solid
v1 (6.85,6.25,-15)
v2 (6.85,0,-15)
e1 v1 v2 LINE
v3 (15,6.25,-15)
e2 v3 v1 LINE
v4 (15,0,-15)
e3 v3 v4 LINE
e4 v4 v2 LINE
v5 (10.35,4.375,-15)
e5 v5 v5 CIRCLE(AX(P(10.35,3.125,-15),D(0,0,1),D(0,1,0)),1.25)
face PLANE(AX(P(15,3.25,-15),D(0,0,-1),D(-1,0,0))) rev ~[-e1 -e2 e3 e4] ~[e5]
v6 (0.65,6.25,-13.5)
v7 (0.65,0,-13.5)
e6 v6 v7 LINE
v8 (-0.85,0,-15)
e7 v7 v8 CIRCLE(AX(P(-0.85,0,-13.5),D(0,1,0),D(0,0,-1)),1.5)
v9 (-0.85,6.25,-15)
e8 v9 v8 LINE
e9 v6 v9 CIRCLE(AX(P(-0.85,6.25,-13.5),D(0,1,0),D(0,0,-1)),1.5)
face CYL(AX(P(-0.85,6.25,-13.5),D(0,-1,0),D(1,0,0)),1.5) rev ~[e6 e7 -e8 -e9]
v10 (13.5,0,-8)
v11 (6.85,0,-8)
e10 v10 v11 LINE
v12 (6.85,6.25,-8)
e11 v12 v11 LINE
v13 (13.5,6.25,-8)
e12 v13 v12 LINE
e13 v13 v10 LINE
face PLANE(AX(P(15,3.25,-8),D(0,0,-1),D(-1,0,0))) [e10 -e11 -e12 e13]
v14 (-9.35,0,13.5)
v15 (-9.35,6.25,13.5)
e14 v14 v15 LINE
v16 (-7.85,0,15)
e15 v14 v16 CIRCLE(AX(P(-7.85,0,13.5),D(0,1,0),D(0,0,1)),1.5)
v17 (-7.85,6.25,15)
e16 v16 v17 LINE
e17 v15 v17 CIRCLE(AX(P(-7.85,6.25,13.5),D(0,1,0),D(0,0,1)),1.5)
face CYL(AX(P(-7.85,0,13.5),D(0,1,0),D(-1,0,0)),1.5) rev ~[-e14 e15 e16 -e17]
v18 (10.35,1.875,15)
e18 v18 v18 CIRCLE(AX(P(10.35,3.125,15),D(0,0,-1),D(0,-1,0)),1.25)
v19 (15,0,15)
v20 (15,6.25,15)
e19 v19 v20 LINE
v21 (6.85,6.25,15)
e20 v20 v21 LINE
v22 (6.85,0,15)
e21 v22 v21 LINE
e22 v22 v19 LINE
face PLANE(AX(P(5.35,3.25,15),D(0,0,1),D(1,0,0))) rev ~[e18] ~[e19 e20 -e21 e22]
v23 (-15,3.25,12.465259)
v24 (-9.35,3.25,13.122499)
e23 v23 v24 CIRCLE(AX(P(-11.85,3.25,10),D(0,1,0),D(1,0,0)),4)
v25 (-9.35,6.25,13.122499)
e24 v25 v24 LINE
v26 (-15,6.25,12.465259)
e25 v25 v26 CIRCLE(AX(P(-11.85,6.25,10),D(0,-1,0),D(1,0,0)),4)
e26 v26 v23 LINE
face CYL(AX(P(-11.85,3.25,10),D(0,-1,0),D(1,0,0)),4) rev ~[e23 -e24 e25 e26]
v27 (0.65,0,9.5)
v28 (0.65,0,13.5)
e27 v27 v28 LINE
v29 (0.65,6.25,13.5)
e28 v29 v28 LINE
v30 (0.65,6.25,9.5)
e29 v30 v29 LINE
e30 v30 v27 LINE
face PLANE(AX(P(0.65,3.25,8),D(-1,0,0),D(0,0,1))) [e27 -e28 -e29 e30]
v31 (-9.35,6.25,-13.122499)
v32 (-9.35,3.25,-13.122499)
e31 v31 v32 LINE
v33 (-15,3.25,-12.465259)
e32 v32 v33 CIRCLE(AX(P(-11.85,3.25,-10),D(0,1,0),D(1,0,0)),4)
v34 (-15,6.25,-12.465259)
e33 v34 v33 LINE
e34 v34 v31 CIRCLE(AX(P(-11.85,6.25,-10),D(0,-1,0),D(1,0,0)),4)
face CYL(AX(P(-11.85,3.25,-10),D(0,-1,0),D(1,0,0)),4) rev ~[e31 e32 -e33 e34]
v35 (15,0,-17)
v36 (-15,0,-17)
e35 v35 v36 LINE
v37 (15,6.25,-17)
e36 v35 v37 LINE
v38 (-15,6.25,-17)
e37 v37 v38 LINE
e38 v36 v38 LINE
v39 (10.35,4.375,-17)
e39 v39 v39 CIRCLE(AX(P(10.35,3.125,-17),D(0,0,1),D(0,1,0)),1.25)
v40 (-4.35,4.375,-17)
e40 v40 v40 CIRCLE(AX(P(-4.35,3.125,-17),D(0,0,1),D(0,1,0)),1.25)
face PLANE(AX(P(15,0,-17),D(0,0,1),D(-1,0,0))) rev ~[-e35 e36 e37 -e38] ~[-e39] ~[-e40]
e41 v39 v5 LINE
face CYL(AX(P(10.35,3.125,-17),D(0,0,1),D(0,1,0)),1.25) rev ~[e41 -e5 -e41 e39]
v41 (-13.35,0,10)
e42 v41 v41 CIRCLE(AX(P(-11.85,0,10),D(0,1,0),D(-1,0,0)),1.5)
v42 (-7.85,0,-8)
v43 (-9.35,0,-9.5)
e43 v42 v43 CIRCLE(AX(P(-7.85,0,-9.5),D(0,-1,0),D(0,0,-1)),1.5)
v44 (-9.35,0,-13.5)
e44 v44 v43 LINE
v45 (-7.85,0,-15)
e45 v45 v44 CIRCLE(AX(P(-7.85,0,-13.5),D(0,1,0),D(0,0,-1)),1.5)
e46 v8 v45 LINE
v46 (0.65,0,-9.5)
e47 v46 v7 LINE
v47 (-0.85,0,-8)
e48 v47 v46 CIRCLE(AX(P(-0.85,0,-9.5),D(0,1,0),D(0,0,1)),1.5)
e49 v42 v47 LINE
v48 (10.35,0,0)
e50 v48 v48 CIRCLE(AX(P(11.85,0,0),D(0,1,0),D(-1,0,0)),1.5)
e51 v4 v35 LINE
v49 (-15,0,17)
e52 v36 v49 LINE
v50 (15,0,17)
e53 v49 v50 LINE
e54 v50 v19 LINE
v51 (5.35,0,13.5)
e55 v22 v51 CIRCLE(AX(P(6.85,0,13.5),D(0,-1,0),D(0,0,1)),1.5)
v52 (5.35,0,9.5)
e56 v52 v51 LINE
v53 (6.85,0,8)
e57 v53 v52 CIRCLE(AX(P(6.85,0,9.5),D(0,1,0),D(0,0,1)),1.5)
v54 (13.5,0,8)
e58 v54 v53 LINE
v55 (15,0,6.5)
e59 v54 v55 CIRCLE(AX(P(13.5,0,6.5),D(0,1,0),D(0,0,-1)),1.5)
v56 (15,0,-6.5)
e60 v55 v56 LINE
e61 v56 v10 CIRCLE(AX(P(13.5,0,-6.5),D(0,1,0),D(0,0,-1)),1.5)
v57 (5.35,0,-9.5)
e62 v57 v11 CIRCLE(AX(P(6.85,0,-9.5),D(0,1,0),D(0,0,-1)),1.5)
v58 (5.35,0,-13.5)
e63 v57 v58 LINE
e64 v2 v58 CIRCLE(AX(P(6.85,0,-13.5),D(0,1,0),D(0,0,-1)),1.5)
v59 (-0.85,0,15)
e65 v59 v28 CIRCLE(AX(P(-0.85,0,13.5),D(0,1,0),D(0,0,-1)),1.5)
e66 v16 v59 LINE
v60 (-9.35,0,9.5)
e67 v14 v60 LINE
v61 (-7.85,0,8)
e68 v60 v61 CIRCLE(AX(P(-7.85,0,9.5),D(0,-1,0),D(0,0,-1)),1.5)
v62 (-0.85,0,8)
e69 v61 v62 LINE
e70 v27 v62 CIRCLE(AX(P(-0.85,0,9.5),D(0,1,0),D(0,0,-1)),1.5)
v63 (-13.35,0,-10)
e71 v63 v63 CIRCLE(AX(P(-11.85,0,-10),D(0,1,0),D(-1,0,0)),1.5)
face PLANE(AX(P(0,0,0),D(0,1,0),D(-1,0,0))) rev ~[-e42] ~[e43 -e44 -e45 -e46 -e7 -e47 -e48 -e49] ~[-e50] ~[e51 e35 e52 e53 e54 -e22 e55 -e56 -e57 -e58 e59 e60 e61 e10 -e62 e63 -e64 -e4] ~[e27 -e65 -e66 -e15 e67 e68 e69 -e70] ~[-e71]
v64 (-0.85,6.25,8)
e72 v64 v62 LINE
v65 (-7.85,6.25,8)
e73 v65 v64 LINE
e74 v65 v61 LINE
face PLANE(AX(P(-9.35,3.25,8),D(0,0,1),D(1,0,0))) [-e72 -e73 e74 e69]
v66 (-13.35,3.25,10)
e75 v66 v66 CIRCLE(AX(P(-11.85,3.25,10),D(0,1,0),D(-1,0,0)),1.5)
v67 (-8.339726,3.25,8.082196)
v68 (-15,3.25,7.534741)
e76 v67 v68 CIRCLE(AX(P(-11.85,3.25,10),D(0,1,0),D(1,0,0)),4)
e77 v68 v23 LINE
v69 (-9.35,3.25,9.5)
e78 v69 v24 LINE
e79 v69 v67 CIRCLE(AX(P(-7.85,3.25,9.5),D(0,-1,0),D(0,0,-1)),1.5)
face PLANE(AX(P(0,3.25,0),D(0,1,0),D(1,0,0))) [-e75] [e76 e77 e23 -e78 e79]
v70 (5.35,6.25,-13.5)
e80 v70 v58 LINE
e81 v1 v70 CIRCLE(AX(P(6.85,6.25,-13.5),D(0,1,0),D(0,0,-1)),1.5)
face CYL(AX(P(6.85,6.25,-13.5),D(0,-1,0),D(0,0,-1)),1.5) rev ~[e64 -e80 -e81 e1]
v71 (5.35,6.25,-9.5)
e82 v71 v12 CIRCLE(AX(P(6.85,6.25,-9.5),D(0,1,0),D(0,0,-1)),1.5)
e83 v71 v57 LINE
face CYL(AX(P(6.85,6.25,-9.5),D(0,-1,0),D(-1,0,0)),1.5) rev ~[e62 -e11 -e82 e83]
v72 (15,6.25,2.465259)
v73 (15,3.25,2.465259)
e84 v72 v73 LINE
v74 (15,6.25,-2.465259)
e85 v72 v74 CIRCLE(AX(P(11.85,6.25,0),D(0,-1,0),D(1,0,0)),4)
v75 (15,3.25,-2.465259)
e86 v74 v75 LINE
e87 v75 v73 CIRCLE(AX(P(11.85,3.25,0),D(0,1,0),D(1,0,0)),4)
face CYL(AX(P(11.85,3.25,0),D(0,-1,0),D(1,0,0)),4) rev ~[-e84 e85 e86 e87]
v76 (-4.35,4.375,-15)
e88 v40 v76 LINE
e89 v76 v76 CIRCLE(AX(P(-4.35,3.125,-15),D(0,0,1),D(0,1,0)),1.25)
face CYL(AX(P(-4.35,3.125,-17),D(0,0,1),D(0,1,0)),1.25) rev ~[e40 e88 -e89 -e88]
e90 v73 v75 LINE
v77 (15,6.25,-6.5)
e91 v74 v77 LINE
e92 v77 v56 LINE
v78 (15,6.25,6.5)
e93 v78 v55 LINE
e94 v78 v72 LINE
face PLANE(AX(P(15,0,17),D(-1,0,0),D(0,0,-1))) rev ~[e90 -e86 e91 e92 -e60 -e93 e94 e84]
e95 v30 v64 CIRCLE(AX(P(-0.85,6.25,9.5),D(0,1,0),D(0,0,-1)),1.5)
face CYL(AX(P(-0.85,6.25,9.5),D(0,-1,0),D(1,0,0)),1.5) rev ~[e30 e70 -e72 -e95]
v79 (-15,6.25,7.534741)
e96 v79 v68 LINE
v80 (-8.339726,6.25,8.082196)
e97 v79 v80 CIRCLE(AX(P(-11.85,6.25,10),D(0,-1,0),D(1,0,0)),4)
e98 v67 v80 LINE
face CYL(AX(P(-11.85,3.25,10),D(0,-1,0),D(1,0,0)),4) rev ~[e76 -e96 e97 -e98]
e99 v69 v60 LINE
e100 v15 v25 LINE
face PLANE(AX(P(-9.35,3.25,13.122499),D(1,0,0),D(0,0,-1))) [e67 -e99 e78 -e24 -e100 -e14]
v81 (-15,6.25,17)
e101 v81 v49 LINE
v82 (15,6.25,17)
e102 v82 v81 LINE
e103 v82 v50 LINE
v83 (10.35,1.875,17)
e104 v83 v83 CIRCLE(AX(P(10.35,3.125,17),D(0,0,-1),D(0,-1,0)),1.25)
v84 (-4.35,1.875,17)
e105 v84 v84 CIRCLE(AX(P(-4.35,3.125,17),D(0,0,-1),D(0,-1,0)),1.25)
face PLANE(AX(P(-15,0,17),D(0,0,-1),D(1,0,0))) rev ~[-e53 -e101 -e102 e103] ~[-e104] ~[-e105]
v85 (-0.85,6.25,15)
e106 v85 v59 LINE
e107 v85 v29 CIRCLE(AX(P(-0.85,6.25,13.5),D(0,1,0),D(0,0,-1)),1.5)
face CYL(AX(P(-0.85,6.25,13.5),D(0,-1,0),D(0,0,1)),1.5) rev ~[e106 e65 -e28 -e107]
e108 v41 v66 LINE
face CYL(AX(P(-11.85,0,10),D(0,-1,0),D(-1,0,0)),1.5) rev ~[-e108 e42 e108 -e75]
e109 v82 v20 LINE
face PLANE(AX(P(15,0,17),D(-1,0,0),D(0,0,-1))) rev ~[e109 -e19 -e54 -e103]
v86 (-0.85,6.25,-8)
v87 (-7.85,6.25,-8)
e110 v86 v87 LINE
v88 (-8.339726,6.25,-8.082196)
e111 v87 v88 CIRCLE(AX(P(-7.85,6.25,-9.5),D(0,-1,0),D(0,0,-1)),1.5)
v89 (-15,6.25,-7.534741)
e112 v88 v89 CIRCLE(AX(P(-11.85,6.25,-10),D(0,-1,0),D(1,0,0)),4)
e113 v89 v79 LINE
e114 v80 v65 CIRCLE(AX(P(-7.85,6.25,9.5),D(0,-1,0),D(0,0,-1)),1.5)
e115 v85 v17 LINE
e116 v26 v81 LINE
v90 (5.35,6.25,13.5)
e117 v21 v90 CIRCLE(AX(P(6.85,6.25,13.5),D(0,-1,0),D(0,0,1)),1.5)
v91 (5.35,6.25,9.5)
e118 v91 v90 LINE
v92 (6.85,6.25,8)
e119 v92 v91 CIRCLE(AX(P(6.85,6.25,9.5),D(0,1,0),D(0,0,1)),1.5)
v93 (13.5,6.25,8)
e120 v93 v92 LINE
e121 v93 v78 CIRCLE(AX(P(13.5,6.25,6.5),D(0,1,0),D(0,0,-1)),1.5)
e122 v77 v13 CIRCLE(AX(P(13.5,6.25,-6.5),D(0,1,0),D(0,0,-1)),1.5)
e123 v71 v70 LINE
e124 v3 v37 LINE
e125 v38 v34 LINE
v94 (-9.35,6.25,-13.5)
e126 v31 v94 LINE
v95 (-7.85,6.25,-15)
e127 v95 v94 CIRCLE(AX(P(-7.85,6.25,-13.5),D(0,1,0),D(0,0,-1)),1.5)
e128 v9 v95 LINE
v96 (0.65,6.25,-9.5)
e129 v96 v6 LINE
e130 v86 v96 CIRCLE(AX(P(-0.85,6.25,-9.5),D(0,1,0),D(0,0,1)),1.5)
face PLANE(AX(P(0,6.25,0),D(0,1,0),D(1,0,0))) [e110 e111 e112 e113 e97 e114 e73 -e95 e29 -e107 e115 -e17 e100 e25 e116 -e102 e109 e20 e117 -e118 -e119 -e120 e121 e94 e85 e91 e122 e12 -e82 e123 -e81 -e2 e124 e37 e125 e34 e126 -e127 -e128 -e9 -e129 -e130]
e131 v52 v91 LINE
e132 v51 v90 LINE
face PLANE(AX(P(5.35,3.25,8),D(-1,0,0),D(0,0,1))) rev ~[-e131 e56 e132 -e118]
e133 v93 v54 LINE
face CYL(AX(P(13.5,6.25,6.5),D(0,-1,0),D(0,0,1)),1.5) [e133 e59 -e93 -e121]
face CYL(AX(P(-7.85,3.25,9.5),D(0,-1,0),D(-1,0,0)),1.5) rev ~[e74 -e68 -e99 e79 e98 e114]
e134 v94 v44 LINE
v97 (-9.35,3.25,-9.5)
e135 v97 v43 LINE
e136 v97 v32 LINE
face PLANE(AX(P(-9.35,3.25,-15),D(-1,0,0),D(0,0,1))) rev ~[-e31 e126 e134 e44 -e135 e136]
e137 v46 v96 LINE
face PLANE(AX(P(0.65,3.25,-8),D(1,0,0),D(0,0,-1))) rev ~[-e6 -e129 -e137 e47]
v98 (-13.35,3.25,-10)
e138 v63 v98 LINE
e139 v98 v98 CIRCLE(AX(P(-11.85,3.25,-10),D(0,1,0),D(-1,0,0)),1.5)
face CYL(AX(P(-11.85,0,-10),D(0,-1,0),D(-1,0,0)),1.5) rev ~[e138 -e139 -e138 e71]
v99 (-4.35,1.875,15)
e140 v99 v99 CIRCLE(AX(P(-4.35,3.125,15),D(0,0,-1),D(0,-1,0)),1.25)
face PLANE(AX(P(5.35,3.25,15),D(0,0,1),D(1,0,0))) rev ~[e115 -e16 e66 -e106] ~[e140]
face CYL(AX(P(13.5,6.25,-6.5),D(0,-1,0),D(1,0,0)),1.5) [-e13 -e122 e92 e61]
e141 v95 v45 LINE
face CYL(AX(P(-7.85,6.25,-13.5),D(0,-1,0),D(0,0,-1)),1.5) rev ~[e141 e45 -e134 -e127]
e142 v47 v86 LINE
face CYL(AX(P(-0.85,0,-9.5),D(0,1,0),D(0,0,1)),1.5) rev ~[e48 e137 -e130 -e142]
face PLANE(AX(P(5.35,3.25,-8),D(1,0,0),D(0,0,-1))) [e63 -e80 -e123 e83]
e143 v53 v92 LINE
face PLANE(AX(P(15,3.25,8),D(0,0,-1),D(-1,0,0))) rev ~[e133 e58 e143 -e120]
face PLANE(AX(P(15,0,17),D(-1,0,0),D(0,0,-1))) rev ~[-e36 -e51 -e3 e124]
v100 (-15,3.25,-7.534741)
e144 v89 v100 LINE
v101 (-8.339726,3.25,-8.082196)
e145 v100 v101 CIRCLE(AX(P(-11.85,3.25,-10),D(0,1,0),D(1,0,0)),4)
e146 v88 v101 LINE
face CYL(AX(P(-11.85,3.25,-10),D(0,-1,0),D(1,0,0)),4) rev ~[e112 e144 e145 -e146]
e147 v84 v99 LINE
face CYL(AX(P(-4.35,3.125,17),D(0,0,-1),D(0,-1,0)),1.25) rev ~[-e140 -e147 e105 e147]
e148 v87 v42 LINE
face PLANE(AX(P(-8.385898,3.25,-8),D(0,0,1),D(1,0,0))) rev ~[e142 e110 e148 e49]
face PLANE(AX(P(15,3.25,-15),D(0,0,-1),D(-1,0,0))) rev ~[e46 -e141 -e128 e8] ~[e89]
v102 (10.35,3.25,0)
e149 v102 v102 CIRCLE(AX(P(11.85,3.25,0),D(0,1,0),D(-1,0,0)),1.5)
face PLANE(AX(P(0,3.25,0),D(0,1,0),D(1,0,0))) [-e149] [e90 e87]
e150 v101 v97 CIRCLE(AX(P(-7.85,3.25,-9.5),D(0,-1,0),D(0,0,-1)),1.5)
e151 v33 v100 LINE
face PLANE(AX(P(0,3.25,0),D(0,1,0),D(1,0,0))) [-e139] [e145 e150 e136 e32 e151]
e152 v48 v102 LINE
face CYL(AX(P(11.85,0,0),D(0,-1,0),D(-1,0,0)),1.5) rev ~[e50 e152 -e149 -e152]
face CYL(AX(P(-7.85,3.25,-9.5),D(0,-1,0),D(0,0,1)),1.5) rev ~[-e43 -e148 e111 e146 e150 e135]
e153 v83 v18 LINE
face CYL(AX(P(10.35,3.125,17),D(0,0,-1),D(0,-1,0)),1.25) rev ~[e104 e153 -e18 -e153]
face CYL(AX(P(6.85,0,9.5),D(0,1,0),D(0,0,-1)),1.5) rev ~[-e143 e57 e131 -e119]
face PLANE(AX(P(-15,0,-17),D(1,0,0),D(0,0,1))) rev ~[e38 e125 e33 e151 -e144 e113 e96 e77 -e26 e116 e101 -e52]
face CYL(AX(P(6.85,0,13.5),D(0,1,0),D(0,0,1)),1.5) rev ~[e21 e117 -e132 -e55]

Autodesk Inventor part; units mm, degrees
ref_plane "YZ Plane" through (0, 0, 0) normal (1, 0, 0) x (0, 1, 0)
ref_plane "XZ Plane" through (0, 0, 0) normal (0, 1, 0) x (-1, 0, 0)
sketch "Sketch1" plane through (0, 0, 0) normal (0, 1, 0) x (-1, 0, 0)
  line L0 (-15, -17) -> (15, -17)
  line L1 (15, -17) -> (15, 17)
  line L2 (15, 17) -> (-15, 17)
  line L3 (-15, 17) -> (-15, -17)
  line L4 (-15, -17) -> (15, 17) construction
  line L5 (15, -17) -> (-15, 17) construction
  line L6 (-21, 0) -> (21, 0) construction
  line L7 (15, 10) -> (-15, 10) construction
  line L8 (11.85, 17) -> (11.85, -17) construction
  line L9 (0, -23.8) -> (0, 23.8) construction
  line L10 (-11.85, 17) -> (-11.85, -17) construction
  line L11 (15, -10) -> (-15, -10) construction
  circle A0 centre (11.85, 10) radius 1.5
  circle A1 centre (11.85, -10) radius 1.5
  circle A2 centre (-11.85, 0) radius 1.5
  point P0 (0, 0)
  dimension "d0" = 34
  dimension "d1" = 30
  dimension "d2" = 10
  dimension "d3" = 11.85
  dimension "d4" = 3
  dimension "d5" = 3
  dimension "d6" = 3
extrude "Extrusion1" add sketch "Sketch1" along normal blind 3.25
sketch "Sketch2" plane through (0, 3.25, 0) normal (0, 1, 0) x (1, 0, 0)
  line L0 (15, 17) -> (-15, 17) projected
  line L1 (15, -17) -> (15, 17) projected
  line L2 (-15, 17) -> (15, 17)
  line L3 (15, 17) -> (15, 15)
  line L4 (15, 15) -> (-15, 15)
  line L5 (-15, 15) -> (-15, 17)
  line L6 (21, 0) -> (-21, 0) construction
  line L7 (15, -17) -> (-15, -17)
  line L8 (15, 17) -> (15, -17)
  line L9 (15, -15) -> (-15, -15)
  line L10 (-15, -15) -> (-15, -17)
  point P0 (0, 0)
  dimension "d9" = 2
extrude "Extrusion2" add sketch "Sketch2" along normal blind 3
sketch "Sketch5" plane through (15, 0, -17) normal (0, 0, -1) x (-1, 0, 0)
  line L0 (0, 0) -> (30, 0) projected
  line L1 (30, 0) -> (30, 6.25) projected
  line L2 (0, 6.25) -> (30, 6.25) projected
  line L3 (0, 0) -> (0, 6.25) projected
  line L4 (0, 3.125) -> (4.65, 3.125) construction
  line L5 (4.65, 3.125) -> (19.35, 3.125) construction
  dimension "d40" = 4.65
  dimension "d41" = 14.7
sketch "Sketch8" plane through (0, 3.25, 0) normal (0, 1, 0) x (1, 0, 0)
  line L0 (15, 15) -> (-15, 15) projected
  line L1 (-15, 15) -> (-15, -15) projected
  line L2 (-15, -15) -> (15, -15) projected
  line L3 (15, -15) -> (15, 15) projected
  circle A0 centre (-11.85, -10) radius 1.5 projected
  circle A1 centre (-11.85, 10) radius 1.5 projected
  circle A2 centre (11.85, 0) radius 1.5 projected
  line L4 (-9.35, -15) -> (-9.35, -8)
  line L5 (-9.35, -8) -> (0.65, -8)
  line L6 (0.65, -8) -> (0.65, -15)
  line L7 (15, -8) -> (5.35, -8)
  line L8 (5.35, -8) -> (5.35, -15)
  line L9 (15, -8) -> (15, -15)
  line L10 (15, -17) -> (15, 17) projected
  line L11 (15, -15) -> (5.35, -15)
  line L12 (0.65, -15) -> (-9.35, -15)
  line L13 (15, 0) -> (-15, 0) construction
  line L14 (-15, 17) -> (-15, -17) construction
  line L15 (-15, 15) -> (15, 15)
  line L16 (15, 15) -> (15, -15)
  line L17 (-9.35, 15) -> (-9.35, 8)
  line L18 (-9.35, 8) -> (0.65, 8)
  line L19 (0.65, 8) -> (0.65, 15)
  line L20 (15, 8) -> (5.35, 8)
  line L21 (5.35, 8) -> (5.35, 15)
  line L22 (15, 8) -> (15, 15)
  line L23 (15, 17) -> (15, -17)
  line L24 (15, 15) -> (5.35, 15)
  line L25 (0.65, 15) -> (-9.35, 15)
  circle A3 centre (11.85, 0) radius 4
  circle A4 centre (-11.85, 10) radius 4
  circle A5 centre (-11.85, -10) radius 4
  point P0 (0, 0)
  dimension "d34" = 9.65
  dimension "d35" = 4.7
  dimension "d36" = 10
  dimension "d37" = 8
  dimension "d44" = 8
extrude "Extrusion5" cut sketch "Sketch8" against normal through all contours L3 L20 L21 L0 | L19 L18 A4 L17 L0 | A4 L18 L17 | L3 L2 L8 L7 | A5 L4 L5 | L5 L6 L2 L4 A5
hole "Hole1" at (-4.35, 3.125, -17) at (10.35, 3.125, -17) direction (0, 0, 1) diameter 2.5 end up to surface
ref_plane "Work Plane1" through (15, 0, 0) normal (0, 0, -1) x (-1, 0, 0)
mirror "Mirror1" about plane through (15, 0, 0) normal (0, 0, -1) of "Hole1"
extrude "Extrusion6" add sketch "Sketch8" along normal blind 3 contours L21 L20 L3 A3 L7 L8 L2 L6 L5 A5 L1 A4 L18 L19 L0 | L3 A3 | L17 A4 L1 L0 | L17 L18 A4 L1 | A5 L5 L4 L1 | A5 L4 L2 L1 picked at (14.45, 0)
extrude "Extrusion7" cut sketch "Sketch8" along normal through all contours A3 L3 | L3 A3 | A4 L18 L17 | L17 L18 A4 L1 | L1 A4 | A5 L5 L4 L1 | L1 A5 | A5 L4 L5
fillet "Fillet3" radius 1.5 12 edges at (-9.35, 3.125, 15) (0.65, 3.125, -8) (-9.35, 1.625, -8) (5.35, 3.125, -8) (5.35, 3.125, 8) (-9.35, 1.625, 8) (0.65, 3.125, 8) (-9.35, 3.125, -15) (0.65, 3.125, -15) (5.35, 3.125, -15) (5.35, 3.125, 15) (0.65, 3.125, 15)
fillet "Fillet4" radius 1.5 2 edges at (15, 3.125, 8) (15, 3.125, -8)
equation "\"d0\" = fix_width"
equation "\"d1\" = fix_length"
equation "\"d7\" = first_layer_thickness"
equation "\"d10\" = thickness - first_layer_thickness"
equation "\"d40\" = side_fix_2_back"
equation "\"d41\" = side_fix_spacing"
equation "\"d34\" = side_fix_2_back + side_fix_clearance"
equation "\"d35\" = side_fix_spacing - 2 * side_fix_clearance"
equation "\"d36\" = 2 * side_fix_clearance"
equation "\"d37\" = cam_fix_clearance"
equation "\"d45\" = thickness - first_layer_thickness"
equation "\"d47\" = thickness - first_layer_thickness"
equation "\"fix_width\" = 34"
equation "\"side_fix_2_back\" = 4.65"
equation "\"side_fix_spacing\" = 14.7"
equation "\"side_fix_clearance\" = 5"
equation "\"cam_fix_clearance\" = 8"
equation "\"fix_length\" = 30"
equation "\"thickness\" = 6.25"
equation "\"first_layer_thickness\" = 3.25"
properties part number "ptgrey_fix2" material "Aluminum 6061"
